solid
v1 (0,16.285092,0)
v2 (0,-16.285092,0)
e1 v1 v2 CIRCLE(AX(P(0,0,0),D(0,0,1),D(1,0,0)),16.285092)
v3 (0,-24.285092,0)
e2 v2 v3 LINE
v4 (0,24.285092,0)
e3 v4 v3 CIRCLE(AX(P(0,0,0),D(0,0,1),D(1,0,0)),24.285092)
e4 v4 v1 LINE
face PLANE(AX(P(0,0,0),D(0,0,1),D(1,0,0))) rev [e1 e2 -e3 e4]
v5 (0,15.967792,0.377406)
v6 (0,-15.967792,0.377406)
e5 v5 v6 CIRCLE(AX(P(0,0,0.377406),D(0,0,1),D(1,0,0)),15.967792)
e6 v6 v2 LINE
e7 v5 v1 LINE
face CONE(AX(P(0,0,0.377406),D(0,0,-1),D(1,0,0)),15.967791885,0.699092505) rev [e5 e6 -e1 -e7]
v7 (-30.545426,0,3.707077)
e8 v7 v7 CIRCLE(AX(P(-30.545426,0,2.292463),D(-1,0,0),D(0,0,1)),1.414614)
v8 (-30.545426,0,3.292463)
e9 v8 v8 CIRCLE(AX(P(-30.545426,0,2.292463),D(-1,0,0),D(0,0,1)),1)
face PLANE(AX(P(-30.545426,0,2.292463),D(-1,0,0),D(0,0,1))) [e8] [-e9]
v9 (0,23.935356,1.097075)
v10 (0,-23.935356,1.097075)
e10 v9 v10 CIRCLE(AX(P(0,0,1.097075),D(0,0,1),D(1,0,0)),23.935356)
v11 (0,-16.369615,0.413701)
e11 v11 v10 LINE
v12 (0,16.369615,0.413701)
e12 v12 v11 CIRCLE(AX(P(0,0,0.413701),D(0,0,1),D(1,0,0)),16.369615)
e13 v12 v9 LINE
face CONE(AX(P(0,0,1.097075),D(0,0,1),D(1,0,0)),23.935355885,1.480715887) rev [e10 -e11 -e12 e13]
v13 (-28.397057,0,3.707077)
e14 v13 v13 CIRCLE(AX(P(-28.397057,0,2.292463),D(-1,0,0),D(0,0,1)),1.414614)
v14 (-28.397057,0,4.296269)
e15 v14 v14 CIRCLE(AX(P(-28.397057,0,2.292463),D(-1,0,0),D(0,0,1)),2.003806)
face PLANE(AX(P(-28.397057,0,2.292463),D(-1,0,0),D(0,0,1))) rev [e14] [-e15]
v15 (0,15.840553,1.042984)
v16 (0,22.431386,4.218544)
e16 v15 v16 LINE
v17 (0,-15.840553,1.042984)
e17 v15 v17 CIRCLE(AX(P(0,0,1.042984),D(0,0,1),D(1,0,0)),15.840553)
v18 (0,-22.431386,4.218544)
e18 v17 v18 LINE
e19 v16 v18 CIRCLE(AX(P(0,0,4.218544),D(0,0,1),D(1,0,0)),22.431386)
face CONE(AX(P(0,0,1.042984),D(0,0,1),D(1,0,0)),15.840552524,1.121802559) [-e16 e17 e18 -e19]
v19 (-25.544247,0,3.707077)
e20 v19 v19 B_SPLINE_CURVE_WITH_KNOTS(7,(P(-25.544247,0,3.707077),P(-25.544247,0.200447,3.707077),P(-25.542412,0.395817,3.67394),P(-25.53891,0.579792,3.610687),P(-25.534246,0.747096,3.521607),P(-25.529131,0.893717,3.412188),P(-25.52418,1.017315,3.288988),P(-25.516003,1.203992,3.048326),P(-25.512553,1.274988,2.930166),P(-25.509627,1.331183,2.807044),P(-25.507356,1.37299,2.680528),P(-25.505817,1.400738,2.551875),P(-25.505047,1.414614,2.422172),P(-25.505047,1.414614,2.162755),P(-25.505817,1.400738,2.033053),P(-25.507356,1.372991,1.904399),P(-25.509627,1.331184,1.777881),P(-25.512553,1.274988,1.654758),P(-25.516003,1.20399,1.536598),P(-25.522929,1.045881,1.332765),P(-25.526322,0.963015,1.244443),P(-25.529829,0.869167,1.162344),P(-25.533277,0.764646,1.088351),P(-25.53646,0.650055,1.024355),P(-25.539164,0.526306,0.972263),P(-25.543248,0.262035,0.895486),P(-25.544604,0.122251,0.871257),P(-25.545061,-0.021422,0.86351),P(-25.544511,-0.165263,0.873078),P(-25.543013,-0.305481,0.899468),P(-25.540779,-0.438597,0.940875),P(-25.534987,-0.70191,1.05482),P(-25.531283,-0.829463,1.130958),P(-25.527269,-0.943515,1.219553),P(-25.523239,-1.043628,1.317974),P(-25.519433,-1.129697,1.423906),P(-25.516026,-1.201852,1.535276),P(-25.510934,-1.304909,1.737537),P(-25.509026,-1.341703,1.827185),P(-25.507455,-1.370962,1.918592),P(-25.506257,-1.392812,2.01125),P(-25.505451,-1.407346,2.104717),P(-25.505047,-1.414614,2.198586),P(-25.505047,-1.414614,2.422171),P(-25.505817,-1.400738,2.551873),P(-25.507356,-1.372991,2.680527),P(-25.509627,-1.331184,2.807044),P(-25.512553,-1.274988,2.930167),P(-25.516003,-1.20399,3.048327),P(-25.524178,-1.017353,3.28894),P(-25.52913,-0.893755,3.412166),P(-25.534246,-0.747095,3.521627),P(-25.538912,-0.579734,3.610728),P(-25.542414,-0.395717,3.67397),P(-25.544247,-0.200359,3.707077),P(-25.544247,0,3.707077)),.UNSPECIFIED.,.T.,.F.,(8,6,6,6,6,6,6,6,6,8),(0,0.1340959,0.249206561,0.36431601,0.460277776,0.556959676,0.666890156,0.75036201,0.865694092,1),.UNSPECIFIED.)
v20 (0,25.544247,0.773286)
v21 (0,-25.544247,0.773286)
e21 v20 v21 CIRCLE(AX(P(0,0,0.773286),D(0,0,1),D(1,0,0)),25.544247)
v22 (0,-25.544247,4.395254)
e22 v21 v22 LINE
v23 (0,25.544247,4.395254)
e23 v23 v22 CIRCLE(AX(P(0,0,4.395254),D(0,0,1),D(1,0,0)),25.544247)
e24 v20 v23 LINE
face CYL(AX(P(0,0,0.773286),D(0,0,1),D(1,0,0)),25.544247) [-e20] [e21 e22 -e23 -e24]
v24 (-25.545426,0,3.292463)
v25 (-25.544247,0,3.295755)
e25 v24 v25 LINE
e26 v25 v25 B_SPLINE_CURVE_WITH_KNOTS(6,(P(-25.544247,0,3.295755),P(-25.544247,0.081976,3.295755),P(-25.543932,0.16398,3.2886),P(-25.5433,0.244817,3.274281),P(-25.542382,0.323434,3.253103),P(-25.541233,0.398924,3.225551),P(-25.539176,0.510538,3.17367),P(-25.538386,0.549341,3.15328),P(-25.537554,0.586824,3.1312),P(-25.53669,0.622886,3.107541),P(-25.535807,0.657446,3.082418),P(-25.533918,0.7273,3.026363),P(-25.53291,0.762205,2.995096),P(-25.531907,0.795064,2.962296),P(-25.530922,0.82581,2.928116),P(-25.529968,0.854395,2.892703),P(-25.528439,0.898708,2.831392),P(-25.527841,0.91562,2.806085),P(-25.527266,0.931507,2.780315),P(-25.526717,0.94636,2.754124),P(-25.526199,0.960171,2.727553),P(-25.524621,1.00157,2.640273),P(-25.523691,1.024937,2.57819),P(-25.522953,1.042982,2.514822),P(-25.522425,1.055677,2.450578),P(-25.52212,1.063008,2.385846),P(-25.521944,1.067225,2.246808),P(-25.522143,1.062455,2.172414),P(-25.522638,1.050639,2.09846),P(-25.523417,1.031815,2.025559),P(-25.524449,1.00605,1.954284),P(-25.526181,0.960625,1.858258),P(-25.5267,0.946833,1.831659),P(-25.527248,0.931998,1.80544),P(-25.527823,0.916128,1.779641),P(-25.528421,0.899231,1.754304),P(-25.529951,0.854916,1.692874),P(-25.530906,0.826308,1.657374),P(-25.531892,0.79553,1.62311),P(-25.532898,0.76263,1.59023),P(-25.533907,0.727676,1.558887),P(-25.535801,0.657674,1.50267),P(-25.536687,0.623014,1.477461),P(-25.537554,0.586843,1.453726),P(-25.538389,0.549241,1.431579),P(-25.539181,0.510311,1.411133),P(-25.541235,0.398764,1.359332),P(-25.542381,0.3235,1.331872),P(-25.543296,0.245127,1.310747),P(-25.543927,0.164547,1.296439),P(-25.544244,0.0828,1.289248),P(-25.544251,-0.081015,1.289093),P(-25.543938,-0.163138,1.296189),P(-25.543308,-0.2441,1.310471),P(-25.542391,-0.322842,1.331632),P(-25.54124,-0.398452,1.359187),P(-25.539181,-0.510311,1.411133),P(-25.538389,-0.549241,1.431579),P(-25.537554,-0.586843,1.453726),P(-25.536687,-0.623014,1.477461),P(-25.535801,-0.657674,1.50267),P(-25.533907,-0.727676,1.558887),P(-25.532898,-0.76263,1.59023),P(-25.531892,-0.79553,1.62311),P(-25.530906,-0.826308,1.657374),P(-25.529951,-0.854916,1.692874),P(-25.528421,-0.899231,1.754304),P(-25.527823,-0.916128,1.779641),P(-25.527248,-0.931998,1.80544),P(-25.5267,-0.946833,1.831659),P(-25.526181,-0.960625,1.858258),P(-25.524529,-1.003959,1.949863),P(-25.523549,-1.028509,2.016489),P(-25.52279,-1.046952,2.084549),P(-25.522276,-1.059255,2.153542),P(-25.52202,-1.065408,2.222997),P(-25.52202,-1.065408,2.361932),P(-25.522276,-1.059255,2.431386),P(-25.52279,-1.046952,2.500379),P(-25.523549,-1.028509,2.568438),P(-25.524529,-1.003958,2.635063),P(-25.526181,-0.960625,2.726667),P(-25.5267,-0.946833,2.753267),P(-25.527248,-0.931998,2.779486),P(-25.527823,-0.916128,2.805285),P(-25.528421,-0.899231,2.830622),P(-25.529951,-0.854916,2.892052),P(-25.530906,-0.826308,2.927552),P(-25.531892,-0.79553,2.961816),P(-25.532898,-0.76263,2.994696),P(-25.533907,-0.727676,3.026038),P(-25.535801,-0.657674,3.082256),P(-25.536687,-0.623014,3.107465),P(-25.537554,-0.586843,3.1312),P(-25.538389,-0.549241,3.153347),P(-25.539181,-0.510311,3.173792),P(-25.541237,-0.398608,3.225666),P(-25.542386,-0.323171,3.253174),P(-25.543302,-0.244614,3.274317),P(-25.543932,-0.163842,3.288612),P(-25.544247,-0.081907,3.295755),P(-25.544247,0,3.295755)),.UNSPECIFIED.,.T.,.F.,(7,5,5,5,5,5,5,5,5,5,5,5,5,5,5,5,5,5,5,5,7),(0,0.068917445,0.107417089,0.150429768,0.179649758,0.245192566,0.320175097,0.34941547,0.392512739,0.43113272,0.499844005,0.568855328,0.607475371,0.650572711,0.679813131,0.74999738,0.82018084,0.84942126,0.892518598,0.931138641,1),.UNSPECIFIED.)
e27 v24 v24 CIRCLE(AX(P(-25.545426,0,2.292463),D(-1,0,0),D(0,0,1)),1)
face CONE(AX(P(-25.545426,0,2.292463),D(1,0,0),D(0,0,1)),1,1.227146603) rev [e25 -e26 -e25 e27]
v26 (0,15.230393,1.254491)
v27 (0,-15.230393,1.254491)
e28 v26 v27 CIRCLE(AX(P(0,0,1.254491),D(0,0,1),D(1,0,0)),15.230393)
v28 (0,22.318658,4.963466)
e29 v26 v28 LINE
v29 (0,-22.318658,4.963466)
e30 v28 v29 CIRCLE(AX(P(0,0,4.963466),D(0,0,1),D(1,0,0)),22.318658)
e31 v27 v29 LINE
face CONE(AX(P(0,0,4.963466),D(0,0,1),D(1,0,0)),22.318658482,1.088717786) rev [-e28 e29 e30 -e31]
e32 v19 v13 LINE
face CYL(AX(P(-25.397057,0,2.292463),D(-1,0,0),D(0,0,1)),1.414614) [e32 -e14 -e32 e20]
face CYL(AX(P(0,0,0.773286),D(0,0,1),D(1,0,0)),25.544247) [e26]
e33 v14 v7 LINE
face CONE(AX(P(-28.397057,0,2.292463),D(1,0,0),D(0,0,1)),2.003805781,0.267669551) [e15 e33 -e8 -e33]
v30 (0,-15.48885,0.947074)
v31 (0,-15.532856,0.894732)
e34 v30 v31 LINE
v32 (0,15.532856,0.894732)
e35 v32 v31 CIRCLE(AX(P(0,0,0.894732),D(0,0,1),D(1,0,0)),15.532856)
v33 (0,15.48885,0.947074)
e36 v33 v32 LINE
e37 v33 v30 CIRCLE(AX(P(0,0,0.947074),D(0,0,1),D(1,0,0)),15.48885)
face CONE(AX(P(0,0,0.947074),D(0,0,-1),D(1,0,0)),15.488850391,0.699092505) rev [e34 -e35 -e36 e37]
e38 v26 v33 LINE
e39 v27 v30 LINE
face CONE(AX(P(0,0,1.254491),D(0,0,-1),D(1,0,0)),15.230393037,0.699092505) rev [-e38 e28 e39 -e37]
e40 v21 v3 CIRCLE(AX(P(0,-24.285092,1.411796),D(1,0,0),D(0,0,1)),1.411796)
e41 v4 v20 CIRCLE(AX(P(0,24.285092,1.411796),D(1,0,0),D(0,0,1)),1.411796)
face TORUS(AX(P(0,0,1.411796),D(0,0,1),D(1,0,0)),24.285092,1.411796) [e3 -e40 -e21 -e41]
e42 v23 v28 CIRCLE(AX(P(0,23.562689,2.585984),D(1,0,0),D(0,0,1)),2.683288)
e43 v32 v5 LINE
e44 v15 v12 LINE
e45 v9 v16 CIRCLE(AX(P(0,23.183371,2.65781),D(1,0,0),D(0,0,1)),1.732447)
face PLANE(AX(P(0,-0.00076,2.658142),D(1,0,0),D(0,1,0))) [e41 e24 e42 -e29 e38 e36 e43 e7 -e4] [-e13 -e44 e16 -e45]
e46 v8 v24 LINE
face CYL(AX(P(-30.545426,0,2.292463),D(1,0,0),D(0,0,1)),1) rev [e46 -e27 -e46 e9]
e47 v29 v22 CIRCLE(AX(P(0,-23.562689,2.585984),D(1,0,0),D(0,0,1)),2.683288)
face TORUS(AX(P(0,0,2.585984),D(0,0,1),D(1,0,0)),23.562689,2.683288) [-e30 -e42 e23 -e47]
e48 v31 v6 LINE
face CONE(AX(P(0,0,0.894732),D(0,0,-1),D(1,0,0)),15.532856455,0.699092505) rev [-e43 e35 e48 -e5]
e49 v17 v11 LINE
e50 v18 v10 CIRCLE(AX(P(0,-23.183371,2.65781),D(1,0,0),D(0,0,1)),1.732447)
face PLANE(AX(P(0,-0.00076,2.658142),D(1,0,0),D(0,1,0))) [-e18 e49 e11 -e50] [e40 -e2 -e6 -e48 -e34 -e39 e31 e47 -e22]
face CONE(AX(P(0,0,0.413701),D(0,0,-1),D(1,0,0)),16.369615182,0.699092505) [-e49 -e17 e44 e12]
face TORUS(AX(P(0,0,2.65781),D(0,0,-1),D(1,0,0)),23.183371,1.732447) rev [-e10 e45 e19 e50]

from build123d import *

# Parameters (mm, degrees)
F4_W     = 51.4225922525
F4_H     = 7.856229553
F5_DEPTH = 26


# Not quite as in the source:
# - a feature names something its author has since deleted; it is built from what else it names


with BuildPart() as f1:
    # F0 (on Front) → F1 (revolve)
    with BuildSketch(Plane.XZ):
        with BuildLine():
            Line((22.3186584817, 4.9634656969), (15.2303930372, 1.2544910423))
            Line((15.2303930372, 1.2544910423), (15.488850391, 0.9470738952))
            Line((15.488850391, 0.9470738952), (15.5328564546, 0.894731726))
            Line((15.5328564546, 0.894731726), (15.8405525238, 1.0429841968))
            Line((15.8405525238, 1.0429841968), (22.4313864066, 4.2185444515))
            ThreePointArc((22.4313864066, 4.2185444515), (24.744105662, 3.4097946744), (23.9353558848, 1.097075419))
            Line((23.9353558848, 1.097075419), (16.3696151821, 0.4137007552))
            Line((16.3696151821, 0.4137007552), (15.9677918852, 0.3774061119))
            Line((15.9677918852, 0.3774061119), (16.2850916386, 0))
            Line((16.2850916386, 0), (24.2850916386, 0))
            ThreePointArc((24.2850916386, 0), (25.023915829, 0.2087553322), (25.5442474517, 0.7732860891))
            Line((25.5442474517, 0.7732860891), (25.5442474517, 4.3952541752))
            ThreePointArc((25.5442474517, 4.3952541752), (24.028202675, 5.2285828576), (22.3186584817, 4.9634656969))
        make_face()
        Polygon((15.8405525238, 1.0429841968), (15.5328564546, 0.894731726), (15.9677918852, 0.3774061119), (16.3696151821, 0.4137007552), align=None)
    revolve(axis=Axis((0, 0, 1.8443568842), (0, 0, 1)))

    # F2 (on Front) → F3 (revolve)
    with BuildSketch(Plane.XZ):
        Polygon((-25.3970567137, 3.7070766557), (-28.3970567137, 3.7070766557), (-28.3970567137, 4.2962685693), (-30.5454257131, 3.7070766557), (-30.5454257131, 3.2924627885), (-25.5454257131, 3.2924627885), align=None)
    revolve(axis=Axis((-26.2971473858, 0, 2.2924627885), (-1, 0, 0)))

    # F4 (on Right) → F5 (cut)
    with BuildSketch(Plane.YZ):
        with Locations((-0.0007599592, 2.6581416605)):
            Rectangle(F4_W, F4_H)
    extrude(amount=F5_DEPTH, mode=Mode.SUBTRACT)


solid = f1.part
